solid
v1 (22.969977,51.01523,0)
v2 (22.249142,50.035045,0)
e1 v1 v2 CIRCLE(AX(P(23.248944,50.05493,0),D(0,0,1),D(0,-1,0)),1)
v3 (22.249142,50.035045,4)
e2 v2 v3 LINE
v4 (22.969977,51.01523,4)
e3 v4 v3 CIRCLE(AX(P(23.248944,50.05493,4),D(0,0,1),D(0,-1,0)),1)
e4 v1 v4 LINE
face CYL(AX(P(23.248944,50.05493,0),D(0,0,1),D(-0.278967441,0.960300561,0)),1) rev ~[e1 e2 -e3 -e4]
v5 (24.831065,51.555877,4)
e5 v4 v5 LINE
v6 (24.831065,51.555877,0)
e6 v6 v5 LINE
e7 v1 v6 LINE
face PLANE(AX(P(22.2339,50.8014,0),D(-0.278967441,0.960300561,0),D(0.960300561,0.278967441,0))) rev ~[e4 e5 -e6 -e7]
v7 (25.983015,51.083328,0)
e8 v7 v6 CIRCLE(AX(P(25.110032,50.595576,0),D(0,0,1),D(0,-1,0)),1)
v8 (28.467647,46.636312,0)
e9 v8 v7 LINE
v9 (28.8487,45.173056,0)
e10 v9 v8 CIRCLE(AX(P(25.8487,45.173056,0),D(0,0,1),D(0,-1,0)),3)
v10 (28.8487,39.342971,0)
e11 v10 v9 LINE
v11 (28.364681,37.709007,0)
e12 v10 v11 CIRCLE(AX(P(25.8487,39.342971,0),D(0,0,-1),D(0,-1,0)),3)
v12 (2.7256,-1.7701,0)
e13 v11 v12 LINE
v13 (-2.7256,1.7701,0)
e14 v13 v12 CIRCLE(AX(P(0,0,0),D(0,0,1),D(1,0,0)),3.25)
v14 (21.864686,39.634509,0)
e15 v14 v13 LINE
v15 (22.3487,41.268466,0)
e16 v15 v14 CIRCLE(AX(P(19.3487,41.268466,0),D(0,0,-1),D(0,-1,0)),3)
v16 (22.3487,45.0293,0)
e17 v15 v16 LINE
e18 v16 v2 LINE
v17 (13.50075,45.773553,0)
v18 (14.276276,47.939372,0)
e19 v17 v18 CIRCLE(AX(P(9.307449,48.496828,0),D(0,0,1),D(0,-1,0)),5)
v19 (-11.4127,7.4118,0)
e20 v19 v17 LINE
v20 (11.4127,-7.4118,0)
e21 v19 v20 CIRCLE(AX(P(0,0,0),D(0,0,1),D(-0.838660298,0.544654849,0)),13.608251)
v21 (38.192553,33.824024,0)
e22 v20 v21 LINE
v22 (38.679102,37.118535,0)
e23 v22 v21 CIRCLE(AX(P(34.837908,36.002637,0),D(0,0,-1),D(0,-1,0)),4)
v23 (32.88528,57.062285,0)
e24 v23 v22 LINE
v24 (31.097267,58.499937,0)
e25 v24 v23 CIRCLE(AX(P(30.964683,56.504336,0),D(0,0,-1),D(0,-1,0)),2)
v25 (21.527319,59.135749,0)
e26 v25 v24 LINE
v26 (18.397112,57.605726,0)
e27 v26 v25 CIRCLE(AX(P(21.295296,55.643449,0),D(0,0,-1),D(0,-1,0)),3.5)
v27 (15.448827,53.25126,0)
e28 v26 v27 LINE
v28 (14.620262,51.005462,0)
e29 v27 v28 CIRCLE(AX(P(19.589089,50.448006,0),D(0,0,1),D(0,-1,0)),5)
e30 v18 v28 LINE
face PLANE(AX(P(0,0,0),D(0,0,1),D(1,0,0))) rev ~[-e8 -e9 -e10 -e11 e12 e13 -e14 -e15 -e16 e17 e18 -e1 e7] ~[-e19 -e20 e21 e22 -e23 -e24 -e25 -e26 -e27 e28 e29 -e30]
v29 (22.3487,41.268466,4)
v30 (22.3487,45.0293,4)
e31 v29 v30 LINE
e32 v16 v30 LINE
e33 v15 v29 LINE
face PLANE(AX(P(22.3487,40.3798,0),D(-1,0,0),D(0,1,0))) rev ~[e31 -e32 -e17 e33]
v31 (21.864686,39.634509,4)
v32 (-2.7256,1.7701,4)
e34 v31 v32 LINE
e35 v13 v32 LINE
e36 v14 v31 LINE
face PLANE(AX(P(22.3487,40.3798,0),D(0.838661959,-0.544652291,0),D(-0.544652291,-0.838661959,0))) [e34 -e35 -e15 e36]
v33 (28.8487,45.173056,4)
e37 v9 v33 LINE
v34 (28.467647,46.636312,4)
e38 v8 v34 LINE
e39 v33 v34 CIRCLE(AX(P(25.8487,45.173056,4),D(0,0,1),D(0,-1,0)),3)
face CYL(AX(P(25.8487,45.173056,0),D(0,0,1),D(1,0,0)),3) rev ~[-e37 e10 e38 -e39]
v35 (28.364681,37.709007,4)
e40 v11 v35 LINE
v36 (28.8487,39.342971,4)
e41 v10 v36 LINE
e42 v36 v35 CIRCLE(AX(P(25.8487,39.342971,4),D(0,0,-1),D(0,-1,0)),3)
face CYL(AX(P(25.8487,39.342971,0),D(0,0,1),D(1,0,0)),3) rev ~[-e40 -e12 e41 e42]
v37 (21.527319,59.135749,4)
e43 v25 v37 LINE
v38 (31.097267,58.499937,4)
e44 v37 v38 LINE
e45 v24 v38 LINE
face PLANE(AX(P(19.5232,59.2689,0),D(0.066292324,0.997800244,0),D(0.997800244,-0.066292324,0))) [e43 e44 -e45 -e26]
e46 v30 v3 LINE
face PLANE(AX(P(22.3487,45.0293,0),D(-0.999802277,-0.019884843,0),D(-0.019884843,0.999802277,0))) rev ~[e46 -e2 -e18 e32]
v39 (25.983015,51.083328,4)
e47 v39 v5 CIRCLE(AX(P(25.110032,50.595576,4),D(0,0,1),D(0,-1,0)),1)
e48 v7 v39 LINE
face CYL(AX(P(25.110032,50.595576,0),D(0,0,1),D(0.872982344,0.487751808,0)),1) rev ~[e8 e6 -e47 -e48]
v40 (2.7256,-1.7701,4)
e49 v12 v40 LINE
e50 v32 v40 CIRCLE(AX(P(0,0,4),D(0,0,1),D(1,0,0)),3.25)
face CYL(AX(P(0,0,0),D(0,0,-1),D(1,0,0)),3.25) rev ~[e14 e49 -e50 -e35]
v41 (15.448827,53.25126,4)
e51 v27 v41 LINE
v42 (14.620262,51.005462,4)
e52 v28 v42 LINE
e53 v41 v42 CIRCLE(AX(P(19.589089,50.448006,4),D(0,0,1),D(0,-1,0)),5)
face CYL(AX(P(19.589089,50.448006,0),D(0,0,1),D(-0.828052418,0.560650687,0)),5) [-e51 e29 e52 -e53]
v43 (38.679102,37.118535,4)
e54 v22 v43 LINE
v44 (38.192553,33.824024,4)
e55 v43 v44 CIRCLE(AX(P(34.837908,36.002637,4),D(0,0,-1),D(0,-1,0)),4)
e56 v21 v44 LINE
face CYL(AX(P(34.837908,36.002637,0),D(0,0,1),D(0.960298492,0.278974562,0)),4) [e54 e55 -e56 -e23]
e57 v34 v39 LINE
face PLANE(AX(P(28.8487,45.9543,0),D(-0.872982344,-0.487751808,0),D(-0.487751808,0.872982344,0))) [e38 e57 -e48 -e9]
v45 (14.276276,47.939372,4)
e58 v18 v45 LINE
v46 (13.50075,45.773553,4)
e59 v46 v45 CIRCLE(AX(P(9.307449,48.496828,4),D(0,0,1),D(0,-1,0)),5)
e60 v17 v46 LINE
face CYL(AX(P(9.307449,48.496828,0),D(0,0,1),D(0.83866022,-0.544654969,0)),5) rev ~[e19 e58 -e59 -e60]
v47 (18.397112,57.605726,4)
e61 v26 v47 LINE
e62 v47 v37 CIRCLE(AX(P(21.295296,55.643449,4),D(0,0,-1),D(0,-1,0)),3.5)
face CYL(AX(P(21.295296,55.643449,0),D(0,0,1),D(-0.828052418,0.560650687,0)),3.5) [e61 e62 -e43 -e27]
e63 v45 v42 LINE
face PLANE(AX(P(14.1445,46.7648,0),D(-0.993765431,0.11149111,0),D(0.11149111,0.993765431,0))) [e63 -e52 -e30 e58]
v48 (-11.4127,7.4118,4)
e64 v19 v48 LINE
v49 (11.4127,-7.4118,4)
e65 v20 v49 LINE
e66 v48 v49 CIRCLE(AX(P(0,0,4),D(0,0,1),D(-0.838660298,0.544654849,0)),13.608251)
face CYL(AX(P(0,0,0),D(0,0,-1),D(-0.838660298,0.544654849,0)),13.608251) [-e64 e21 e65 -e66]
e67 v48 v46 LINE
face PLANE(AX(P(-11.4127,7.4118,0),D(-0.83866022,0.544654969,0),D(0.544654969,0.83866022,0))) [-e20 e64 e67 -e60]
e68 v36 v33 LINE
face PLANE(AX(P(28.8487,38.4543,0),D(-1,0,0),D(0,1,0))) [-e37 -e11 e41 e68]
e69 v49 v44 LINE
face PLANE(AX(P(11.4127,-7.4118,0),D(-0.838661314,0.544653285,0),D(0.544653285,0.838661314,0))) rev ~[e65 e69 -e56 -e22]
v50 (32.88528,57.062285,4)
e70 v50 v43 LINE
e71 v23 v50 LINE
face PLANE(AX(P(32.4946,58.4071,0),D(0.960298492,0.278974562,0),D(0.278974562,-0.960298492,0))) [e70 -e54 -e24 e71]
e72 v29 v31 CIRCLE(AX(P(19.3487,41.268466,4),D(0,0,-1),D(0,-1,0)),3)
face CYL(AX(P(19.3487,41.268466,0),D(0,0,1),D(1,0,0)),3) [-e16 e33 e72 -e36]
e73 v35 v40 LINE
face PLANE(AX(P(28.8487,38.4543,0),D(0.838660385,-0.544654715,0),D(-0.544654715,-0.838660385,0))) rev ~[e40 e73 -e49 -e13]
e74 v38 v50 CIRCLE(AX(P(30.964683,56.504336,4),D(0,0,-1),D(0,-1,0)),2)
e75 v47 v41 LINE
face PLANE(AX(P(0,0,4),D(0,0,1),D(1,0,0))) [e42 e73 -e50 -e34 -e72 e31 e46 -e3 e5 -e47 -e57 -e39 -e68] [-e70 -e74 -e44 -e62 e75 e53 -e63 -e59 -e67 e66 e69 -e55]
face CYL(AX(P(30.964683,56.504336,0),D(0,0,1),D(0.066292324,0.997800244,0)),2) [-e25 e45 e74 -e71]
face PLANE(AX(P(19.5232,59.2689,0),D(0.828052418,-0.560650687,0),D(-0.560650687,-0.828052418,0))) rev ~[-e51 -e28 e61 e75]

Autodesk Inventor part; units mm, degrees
ref_plane "YZ Plane" through (0, 0, 0) normal (1, 0, 0) x (0, 1, 0)
ref_plane "XZ Plane" through (0, 0, 0) normal (0, 1, 0) x (-1, 0, 0)
ref_plane "XY Plane" through (0, 0, 0) normal (0, 0, 1) x (1, 0, 0)
sketch "Body" plane through (0, 0, 0) normal (0, 0, 1) x (1, 0, 0)
  line L0 (28.8487, 38.4543) -> (2.7256, -1.7701)
  line L1 (22.3487, 40.3798) -> (-2.7256, 1.7701)
  line L2 (22.3487, 40.3798) -> (22.3487, 45.0293)
  line L3 (28.8487, 38.4543) -> (28.8487, 45.9543)
  line L4 (32.4946, 58.4071) -> (39.19, 35.3599)
  line L5 (19.5232, 59.2689) -> (32.4946, 58.4071)
  line L6 (14.1445, 46.7648) -> (14.7577, 52.2305)
  line L7 (22.3487, 45.0293) -> (20.7935, 50.3829) construction
  line L8 (28.8487, 45.9543) -> (27.0354, 52.1963) construction
  arc A0 (-11.4127, 7.4118) -> (11.4127, -7.4118) centre (0, 0) ccw
  line L9 (-11.4127, 7.4118) -> (14.1445, 46.7648)
  line L10 (11.4127, -7.4118) -> (39.19, 35.3599)
  circle A1 centre (0, 0) radius 3.25
  line L11 (25.5987, 39.4171) -> (0, 0) construction
  line L12 (25.5987, 39.4171) -> (25.5987, 45.4918) construction
  line L13 (25.5987, 45.4918) -> (24.7618, 48.3727) construction
  line L14 (19.5232, 59.2689) -> (14.7577, 52.2305)
  line L15 (-30.4273, 0) -> (50.7929, 0) construction
  line L16 (20.7935, 50.3829) -> (22.2339, 50.8014) construction
  line L17 (22.3487, 45.0293) -> (22.2339, 50.8014)
  line L18 (28.8487, 45.9543) -> (25.595, 51.7778)
  line L19 (22.2339, 50.8014) -> (25.595, 51.7778)
  line L20 (25.595, 51.7778) -> (27.0354, 52.1963) construction
  dimension "d37" = 6.5
  dimension "d38" = 130.8
  dimension "d45" = 3.25
  dimension "d46" = 3.25
  dimension "d47" = 3.25
  dimension "d48" = 3.25
  dimension "d49" = 3.25
  dimension "d50" = 3.25
  dimension "d51" = 47
  dimension "d52" = 7.5
  dimension "d54" = 123.001
  dimension "d56" = 130.8
  dimension "d57" = 24
  dimension "d58" = 13
  dimension "d59" = 8.5
  dimension "d60" = 5.5
  dimension "d61" = 110
  dimension "d62" = 120.3
  dimension "d63" = 51
  dimension "d64" = 153.4
  dimension "d74" = 6.5
  dimension "d75" = 1.5
  dimension "d76" = 1.5
extrude "BodyFeature" add sketch "Body" along normal blind 4
fillet "BodyFillet1Feature" radius 3.5 1 edges at (19.5232, 59.2689, 2)
fillet "BodyFillet2Feature" radius 5 1 edges at (14.7577, 52.2305, 2)
fillet "BodyFillet3Feature" radius 2 1 edges at (32.4946, 58.4071, 2)
fillet "BodyFillet4Feature" radius 4 1 edges at (39.19, 35.3599, 2)
fillet "BodyFillet5Feature" radius 5 1 edges at (14.1445, 46.7648, 2)
fillet "InsideFilletsFeature" radius 3 4 edges at (22.3487, 40.3798, 2) (22.3487, 45.0293, 2) (28.8487, 45.9543, 2) (28.8487, 38.4543, 2)
fillet "InsideFilletsSmallFeature" radius 1 2 edges at (22.2339, 50.8014, 2) (25.595, 51.7778, 2)
properties part number "PelvisLinkLeft"
